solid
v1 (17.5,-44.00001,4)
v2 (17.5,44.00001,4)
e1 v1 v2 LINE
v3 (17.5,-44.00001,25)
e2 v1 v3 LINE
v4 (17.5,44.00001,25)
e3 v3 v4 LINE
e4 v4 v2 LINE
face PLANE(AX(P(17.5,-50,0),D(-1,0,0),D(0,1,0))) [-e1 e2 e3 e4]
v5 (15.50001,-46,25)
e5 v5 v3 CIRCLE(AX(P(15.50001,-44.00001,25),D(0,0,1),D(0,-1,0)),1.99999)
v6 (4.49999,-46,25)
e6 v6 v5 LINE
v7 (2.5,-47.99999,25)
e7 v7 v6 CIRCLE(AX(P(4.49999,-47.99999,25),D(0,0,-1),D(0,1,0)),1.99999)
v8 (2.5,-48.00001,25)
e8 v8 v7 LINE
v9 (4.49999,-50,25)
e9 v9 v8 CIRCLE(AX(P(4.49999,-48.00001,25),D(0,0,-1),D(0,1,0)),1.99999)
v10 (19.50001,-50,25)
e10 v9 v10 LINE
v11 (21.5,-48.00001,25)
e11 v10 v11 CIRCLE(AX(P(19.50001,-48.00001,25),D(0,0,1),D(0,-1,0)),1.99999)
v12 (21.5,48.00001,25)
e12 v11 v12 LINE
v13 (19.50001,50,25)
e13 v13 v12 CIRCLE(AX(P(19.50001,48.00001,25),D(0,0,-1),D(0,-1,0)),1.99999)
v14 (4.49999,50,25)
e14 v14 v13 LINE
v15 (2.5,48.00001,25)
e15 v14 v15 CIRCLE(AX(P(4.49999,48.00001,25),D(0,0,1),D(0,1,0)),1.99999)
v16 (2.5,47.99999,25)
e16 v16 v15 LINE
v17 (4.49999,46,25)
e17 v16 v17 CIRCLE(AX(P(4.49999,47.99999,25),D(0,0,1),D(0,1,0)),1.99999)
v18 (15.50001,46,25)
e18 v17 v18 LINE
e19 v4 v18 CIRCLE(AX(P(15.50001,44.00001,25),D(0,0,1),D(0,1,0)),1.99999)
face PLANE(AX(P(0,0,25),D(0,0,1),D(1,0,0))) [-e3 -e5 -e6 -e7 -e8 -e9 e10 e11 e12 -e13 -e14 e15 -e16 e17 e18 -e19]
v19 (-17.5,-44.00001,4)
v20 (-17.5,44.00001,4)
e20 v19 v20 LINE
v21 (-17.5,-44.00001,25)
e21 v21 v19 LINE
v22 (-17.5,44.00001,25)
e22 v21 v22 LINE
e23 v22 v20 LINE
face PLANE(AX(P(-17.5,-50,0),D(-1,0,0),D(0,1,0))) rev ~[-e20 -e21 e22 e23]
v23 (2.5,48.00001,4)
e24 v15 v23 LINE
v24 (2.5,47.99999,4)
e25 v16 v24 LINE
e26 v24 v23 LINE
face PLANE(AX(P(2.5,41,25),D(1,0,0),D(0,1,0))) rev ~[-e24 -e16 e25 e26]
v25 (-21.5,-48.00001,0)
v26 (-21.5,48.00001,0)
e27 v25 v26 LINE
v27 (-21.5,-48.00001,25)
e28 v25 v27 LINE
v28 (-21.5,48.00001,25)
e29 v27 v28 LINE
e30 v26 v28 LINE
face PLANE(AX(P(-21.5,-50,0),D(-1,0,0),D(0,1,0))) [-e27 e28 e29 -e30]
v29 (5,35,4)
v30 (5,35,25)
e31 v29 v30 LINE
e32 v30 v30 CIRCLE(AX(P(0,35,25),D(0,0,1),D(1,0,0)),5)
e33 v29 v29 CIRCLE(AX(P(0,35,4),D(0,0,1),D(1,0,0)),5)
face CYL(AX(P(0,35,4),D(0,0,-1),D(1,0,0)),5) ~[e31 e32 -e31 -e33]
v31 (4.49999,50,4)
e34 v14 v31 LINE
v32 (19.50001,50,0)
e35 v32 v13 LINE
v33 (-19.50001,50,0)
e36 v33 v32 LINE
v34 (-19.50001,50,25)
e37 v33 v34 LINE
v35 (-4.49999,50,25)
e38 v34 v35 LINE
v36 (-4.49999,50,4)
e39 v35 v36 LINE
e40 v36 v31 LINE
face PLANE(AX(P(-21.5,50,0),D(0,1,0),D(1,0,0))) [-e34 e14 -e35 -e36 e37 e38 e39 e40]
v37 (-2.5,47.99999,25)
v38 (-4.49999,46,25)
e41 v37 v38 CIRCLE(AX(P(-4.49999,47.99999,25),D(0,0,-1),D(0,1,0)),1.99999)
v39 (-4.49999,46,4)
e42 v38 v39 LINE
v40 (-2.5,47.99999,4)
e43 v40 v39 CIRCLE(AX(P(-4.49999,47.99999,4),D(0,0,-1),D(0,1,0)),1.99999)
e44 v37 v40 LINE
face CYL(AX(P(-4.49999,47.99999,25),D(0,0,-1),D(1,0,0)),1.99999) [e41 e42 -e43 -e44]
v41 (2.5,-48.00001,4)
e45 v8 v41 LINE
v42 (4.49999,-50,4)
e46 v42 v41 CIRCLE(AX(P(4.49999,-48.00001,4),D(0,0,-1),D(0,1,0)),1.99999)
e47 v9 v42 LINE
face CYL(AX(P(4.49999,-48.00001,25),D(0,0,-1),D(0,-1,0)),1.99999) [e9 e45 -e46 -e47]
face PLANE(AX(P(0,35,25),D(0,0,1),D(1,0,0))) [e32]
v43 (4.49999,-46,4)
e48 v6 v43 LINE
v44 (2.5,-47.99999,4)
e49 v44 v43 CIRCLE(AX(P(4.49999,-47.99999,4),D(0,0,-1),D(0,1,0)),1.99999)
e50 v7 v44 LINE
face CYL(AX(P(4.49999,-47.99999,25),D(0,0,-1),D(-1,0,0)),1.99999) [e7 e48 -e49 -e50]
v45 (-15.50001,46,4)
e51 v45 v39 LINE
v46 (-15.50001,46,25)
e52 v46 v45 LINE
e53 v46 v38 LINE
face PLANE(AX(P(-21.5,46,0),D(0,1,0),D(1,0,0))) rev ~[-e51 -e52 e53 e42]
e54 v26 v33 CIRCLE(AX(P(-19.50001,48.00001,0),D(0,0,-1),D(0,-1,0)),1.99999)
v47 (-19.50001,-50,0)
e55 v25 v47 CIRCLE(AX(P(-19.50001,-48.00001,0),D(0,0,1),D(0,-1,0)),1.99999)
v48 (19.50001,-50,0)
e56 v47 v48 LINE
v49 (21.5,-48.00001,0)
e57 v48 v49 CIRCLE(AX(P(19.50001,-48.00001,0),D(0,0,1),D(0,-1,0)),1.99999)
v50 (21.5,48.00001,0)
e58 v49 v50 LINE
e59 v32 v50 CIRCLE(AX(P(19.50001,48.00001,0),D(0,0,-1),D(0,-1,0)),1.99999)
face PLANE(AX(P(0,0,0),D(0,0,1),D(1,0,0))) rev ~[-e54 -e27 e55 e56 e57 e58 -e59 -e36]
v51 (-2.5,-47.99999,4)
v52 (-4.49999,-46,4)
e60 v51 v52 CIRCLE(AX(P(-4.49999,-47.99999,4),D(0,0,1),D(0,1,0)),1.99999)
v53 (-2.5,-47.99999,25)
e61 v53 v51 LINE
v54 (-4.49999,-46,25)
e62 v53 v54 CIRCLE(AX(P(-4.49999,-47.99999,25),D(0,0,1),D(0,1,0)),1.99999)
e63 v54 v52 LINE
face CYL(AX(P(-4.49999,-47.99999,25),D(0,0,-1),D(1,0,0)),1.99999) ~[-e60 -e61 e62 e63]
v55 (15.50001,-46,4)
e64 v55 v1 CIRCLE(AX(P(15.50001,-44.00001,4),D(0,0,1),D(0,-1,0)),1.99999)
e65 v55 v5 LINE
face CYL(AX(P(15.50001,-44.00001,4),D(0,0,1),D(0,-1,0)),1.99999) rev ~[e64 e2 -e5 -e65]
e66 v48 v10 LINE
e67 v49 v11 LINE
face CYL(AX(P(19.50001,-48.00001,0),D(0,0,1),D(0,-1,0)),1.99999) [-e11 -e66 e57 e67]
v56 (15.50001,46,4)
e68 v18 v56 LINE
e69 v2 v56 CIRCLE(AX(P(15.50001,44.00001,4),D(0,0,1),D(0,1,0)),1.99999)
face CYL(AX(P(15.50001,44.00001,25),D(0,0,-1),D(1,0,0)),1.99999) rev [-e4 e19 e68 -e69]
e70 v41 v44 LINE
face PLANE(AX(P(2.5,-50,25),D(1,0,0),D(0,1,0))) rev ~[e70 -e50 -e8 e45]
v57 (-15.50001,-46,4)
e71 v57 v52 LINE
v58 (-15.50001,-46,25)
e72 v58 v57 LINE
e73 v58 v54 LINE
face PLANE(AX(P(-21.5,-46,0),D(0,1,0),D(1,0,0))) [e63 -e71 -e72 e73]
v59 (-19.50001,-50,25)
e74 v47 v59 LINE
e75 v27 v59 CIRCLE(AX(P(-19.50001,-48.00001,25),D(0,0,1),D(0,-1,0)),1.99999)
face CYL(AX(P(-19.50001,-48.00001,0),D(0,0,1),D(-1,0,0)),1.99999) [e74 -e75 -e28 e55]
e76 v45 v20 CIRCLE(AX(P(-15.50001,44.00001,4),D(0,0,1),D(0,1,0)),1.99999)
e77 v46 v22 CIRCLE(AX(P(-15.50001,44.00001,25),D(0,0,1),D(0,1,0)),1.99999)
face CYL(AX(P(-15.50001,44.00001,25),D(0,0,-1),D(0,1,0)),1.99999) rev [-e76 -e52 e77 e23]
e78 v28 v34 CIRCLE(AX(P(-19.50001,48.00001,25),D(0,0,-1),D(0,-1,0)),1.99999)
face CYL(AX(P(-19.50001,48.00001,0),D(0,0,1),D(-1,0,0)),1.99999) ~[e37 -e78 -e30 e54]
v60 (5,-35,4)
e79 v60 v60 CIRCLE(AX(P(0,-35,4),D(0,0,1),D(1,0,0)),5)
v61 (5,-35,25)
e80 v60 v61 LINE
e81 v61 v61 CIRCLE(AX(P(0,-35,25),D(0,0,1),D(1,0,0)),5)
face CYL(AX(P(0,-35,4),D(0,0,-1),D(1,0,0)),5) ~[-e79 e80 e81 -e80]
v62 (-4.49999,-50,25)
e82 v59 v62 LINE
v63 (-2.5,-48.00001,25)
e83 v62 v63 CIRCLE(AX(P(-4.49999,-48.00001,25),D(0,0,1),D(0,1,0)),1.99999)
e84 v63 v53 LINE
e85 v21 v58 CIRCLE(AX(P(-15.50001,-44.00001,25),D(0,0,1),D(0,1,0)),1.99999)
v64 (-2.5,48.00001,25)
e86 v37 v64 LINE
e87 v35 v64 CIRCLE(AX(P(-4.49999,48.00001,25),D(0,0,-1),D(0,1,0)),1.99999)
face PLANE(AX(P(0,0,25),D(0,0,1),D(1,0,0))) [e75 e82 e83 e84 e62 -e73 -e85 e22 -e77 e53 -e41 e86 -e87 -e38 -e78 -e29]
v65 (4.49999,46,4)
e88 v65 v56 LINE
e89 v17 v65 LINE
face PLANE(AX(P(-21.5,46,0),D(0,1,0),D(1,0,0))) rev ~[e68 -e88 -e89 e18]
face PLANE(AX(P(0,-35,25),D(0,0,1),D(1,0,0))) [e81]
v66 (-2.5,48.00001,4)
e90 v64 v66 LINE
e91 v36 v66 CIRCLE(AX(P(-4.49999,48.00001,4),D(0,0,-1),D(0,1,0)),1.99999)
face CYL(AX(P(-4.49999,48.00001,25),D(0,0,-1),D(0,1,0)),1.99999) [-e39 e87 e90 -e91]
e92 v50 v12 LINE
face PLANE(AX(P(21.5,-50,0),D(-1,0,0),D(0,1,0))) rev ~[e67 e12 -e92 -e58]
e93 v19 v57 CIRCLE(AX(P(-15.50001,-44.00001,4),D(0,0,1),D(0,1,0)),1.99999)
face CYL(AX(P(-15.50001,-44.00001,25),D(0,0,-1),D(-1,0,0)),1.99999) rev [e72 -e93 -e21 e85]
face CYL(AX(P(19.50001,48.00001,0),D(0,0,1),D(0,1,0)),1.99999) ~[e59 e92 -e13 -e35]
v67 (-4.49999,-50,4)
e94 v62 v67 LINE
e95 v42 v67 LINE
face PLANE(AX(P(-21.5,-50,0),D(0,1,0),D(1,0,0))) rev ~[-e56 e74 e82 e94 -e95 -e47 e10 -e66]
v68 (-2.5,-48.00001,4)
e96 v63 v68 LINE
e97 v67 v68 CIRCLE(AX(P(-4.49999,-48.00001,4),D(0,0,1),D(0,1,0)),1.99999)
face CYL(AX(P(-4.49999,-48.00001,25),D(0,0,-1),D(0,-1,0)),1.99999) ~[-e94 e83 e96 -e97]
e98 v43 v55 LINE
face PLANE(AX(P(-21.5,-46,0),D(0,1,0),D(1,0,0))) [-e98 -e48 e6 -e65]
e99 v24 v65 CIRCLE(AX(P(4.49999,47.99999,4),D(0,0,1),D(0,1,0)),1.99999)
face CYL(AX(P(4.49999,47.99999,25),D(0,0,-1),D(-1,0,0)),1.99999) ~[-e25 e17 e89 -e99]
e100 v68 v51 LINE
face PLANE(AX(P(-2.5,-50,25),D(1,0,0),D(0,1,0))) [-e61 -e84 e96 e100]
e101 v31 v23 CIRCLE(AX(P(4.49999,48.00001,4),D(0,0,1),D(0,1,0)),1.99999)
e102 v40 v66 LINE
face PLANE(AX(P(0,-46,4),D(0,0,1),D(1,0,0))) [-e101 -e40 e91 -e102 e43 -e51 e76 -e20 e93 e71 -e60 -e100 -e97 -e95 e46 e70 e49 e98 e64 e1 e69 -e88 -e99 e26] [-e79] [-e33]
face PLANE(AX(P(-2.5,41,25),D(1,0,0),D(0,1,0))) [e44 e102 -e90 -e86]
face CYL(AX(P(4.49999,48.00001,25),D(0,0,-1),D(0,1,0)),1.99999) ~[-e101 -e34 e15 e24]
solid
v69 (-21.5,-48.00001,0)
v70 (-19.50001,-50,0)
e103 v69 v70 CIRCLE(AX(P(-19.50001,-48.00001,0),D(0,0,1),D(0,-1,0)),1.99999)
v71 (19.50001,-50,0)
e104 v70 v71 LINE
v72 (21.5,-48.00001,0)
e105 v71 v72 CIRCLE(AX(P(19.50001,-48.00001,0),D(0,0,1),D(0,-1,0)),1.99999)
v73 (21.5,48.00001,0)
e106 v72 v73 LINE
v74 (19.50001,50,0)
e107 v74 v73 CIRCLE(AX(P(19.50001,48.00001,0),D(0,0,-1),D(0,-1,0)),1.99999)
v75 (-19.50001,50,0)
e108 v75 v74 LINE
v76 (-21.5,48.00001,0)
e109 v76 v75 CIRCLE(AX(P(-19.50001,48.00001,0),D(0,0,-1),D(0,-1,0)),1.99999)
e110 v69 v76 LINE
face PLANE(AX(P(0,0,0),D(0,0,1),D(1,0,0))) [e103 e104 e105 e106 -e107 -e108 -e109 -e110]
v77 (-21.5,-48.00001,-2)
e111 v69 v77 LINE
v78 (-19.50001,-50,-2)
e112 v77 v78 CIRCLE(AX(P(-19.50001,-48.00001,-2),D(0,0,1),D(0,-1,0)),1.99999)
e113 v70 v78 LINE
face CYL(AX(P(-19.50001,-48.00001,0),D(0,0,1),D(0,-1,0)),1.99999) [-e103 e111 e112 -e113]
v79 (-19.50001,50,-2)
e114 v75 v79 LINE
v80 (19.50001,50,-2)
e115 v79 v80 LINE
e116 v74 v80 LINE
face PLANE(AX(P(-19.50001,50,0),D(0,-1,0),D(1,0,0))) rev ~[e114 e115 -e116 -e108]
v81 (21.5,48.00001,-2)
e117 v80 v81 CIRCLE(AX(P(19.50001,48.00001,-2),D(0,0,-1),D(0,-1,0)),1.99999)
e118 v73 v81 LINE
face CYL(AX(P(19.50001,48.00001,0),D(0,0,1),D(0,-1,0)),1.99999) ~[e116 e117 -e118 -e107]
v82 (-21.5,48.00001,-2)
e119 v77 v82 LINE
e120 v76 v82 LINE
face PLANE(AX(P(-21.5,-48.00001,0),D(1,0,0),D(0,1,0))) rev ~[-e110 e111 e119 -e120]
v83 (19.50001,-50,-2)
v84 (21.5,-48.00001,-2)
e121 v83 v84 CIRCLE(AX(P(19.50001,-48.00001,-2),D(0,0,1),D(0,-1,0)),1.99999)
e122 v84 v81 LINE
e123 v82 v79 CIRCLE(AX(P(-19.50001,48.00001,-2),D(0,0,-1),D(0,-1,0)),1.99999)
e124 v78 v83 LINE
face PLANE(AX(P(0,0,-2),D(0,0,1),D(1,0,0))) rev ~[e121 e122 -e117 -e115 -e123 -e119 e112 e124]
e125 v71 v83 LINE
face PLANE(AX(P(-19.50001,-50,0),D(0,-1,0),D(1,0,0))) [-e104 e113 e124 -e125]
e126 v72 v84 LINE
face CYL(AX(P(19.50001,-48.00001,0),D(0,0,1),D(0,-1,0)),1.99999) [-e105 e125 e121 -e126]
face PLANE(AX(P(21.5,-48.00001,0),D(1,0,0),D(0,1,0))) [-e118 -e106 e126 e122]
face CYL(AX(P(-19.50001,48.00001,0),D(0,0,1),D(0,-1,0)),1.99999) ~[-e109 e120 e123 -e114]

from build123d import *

# Parameters (mm, degrees)
F0_W     = 43
F0_H     = 100
F1_DEPTH = 25
F2_T     = -4
F3_R     = 5
F4_DEPTH = 21
F5_W     = 5
F5_H     = 10
F5_H_2   = 8
F6_DEPTH = 21
F7_R     = 1.99999
F8_DEPTH = 2


# Not quite as in the source:
# - a fillet or chamfer is up to 0.001 mm smaller than in the source, because OpenCascade refuses the exact size


with BuildPart() as f1:
    # F0 (on Top) → F1 (new body)
    with BuildSketch(Plane.XY):
        Rectangle(F0_W, F0_H)
    extrude(amount=F1_DEPTH)

    # F2
    f2_openings = [f1.faces().sort_by_distance(p)[0] for p in [
        (0, 0, 25),
    ]]
    offset(amount=F2_T, openings=f2_openings)

    # F3 (on face) → F4 (join, through all)
    with BuildSketch(Plane.XY.offset(4)):
        with Locations((0, 35)):
            Circle(F3_R)
        with Locations((0, -35)):
            Circle(F3_R)
    extrude(amount=F4_DEPTH)

    # F5 (on face) → F6 (cut, through all)
    with BuildSketch(Plane.XY.offset(25)):
        with Locations((0, 46)):
            Rectangle(F5_W, F5_H)
        with Locations((0, -46)):
            Rectangle(F5_W, F5_H_2)
    extrude(amount=-F6_DEPTH, mode=Mode.SUBTRACT)

    # F7 (radius 2 in the source; OpenCascade refuses exactly that, so slightly less here)
    f7_edges = [f1.edges().sort_by_distance(p)[0] for p in [
        (-2.5, -46, 14.5),
        (-2.5, -50, 14.5),
        (2.5, -50, 14.5),
        (-2.5, 50, 14.5),
        (-2.5, 46, 14.5),
        (2.5, 46, 14.5),
        (2.5, -46, 14.5),
        (2.5, 50, 14.5),
        (17.5, 46, 14.5),
        (17.5, -46, 14.5),
        (-17.5, -46, 14.5),
        (-17.5, 46, 14.5),
        (-21.5, -50, 12.5),
        (21.5, -50, 12.5),
        (21.5, 50, 12.5),
        (-21.5, 50, 12.5),
    ]]
    fillet(f7_edges, radius=F7_R)


with BuildPart() as f8:
    # F8 (new): a face of the model
    f8_faces = [f1.part.faces().sort_by_distance(p)[0] for p in [
        (0, 0, 0),
    ]]
    extrude(f8_faces, amount=F8_DEPTH)


solid = Compound([f1.part, f8.part])
